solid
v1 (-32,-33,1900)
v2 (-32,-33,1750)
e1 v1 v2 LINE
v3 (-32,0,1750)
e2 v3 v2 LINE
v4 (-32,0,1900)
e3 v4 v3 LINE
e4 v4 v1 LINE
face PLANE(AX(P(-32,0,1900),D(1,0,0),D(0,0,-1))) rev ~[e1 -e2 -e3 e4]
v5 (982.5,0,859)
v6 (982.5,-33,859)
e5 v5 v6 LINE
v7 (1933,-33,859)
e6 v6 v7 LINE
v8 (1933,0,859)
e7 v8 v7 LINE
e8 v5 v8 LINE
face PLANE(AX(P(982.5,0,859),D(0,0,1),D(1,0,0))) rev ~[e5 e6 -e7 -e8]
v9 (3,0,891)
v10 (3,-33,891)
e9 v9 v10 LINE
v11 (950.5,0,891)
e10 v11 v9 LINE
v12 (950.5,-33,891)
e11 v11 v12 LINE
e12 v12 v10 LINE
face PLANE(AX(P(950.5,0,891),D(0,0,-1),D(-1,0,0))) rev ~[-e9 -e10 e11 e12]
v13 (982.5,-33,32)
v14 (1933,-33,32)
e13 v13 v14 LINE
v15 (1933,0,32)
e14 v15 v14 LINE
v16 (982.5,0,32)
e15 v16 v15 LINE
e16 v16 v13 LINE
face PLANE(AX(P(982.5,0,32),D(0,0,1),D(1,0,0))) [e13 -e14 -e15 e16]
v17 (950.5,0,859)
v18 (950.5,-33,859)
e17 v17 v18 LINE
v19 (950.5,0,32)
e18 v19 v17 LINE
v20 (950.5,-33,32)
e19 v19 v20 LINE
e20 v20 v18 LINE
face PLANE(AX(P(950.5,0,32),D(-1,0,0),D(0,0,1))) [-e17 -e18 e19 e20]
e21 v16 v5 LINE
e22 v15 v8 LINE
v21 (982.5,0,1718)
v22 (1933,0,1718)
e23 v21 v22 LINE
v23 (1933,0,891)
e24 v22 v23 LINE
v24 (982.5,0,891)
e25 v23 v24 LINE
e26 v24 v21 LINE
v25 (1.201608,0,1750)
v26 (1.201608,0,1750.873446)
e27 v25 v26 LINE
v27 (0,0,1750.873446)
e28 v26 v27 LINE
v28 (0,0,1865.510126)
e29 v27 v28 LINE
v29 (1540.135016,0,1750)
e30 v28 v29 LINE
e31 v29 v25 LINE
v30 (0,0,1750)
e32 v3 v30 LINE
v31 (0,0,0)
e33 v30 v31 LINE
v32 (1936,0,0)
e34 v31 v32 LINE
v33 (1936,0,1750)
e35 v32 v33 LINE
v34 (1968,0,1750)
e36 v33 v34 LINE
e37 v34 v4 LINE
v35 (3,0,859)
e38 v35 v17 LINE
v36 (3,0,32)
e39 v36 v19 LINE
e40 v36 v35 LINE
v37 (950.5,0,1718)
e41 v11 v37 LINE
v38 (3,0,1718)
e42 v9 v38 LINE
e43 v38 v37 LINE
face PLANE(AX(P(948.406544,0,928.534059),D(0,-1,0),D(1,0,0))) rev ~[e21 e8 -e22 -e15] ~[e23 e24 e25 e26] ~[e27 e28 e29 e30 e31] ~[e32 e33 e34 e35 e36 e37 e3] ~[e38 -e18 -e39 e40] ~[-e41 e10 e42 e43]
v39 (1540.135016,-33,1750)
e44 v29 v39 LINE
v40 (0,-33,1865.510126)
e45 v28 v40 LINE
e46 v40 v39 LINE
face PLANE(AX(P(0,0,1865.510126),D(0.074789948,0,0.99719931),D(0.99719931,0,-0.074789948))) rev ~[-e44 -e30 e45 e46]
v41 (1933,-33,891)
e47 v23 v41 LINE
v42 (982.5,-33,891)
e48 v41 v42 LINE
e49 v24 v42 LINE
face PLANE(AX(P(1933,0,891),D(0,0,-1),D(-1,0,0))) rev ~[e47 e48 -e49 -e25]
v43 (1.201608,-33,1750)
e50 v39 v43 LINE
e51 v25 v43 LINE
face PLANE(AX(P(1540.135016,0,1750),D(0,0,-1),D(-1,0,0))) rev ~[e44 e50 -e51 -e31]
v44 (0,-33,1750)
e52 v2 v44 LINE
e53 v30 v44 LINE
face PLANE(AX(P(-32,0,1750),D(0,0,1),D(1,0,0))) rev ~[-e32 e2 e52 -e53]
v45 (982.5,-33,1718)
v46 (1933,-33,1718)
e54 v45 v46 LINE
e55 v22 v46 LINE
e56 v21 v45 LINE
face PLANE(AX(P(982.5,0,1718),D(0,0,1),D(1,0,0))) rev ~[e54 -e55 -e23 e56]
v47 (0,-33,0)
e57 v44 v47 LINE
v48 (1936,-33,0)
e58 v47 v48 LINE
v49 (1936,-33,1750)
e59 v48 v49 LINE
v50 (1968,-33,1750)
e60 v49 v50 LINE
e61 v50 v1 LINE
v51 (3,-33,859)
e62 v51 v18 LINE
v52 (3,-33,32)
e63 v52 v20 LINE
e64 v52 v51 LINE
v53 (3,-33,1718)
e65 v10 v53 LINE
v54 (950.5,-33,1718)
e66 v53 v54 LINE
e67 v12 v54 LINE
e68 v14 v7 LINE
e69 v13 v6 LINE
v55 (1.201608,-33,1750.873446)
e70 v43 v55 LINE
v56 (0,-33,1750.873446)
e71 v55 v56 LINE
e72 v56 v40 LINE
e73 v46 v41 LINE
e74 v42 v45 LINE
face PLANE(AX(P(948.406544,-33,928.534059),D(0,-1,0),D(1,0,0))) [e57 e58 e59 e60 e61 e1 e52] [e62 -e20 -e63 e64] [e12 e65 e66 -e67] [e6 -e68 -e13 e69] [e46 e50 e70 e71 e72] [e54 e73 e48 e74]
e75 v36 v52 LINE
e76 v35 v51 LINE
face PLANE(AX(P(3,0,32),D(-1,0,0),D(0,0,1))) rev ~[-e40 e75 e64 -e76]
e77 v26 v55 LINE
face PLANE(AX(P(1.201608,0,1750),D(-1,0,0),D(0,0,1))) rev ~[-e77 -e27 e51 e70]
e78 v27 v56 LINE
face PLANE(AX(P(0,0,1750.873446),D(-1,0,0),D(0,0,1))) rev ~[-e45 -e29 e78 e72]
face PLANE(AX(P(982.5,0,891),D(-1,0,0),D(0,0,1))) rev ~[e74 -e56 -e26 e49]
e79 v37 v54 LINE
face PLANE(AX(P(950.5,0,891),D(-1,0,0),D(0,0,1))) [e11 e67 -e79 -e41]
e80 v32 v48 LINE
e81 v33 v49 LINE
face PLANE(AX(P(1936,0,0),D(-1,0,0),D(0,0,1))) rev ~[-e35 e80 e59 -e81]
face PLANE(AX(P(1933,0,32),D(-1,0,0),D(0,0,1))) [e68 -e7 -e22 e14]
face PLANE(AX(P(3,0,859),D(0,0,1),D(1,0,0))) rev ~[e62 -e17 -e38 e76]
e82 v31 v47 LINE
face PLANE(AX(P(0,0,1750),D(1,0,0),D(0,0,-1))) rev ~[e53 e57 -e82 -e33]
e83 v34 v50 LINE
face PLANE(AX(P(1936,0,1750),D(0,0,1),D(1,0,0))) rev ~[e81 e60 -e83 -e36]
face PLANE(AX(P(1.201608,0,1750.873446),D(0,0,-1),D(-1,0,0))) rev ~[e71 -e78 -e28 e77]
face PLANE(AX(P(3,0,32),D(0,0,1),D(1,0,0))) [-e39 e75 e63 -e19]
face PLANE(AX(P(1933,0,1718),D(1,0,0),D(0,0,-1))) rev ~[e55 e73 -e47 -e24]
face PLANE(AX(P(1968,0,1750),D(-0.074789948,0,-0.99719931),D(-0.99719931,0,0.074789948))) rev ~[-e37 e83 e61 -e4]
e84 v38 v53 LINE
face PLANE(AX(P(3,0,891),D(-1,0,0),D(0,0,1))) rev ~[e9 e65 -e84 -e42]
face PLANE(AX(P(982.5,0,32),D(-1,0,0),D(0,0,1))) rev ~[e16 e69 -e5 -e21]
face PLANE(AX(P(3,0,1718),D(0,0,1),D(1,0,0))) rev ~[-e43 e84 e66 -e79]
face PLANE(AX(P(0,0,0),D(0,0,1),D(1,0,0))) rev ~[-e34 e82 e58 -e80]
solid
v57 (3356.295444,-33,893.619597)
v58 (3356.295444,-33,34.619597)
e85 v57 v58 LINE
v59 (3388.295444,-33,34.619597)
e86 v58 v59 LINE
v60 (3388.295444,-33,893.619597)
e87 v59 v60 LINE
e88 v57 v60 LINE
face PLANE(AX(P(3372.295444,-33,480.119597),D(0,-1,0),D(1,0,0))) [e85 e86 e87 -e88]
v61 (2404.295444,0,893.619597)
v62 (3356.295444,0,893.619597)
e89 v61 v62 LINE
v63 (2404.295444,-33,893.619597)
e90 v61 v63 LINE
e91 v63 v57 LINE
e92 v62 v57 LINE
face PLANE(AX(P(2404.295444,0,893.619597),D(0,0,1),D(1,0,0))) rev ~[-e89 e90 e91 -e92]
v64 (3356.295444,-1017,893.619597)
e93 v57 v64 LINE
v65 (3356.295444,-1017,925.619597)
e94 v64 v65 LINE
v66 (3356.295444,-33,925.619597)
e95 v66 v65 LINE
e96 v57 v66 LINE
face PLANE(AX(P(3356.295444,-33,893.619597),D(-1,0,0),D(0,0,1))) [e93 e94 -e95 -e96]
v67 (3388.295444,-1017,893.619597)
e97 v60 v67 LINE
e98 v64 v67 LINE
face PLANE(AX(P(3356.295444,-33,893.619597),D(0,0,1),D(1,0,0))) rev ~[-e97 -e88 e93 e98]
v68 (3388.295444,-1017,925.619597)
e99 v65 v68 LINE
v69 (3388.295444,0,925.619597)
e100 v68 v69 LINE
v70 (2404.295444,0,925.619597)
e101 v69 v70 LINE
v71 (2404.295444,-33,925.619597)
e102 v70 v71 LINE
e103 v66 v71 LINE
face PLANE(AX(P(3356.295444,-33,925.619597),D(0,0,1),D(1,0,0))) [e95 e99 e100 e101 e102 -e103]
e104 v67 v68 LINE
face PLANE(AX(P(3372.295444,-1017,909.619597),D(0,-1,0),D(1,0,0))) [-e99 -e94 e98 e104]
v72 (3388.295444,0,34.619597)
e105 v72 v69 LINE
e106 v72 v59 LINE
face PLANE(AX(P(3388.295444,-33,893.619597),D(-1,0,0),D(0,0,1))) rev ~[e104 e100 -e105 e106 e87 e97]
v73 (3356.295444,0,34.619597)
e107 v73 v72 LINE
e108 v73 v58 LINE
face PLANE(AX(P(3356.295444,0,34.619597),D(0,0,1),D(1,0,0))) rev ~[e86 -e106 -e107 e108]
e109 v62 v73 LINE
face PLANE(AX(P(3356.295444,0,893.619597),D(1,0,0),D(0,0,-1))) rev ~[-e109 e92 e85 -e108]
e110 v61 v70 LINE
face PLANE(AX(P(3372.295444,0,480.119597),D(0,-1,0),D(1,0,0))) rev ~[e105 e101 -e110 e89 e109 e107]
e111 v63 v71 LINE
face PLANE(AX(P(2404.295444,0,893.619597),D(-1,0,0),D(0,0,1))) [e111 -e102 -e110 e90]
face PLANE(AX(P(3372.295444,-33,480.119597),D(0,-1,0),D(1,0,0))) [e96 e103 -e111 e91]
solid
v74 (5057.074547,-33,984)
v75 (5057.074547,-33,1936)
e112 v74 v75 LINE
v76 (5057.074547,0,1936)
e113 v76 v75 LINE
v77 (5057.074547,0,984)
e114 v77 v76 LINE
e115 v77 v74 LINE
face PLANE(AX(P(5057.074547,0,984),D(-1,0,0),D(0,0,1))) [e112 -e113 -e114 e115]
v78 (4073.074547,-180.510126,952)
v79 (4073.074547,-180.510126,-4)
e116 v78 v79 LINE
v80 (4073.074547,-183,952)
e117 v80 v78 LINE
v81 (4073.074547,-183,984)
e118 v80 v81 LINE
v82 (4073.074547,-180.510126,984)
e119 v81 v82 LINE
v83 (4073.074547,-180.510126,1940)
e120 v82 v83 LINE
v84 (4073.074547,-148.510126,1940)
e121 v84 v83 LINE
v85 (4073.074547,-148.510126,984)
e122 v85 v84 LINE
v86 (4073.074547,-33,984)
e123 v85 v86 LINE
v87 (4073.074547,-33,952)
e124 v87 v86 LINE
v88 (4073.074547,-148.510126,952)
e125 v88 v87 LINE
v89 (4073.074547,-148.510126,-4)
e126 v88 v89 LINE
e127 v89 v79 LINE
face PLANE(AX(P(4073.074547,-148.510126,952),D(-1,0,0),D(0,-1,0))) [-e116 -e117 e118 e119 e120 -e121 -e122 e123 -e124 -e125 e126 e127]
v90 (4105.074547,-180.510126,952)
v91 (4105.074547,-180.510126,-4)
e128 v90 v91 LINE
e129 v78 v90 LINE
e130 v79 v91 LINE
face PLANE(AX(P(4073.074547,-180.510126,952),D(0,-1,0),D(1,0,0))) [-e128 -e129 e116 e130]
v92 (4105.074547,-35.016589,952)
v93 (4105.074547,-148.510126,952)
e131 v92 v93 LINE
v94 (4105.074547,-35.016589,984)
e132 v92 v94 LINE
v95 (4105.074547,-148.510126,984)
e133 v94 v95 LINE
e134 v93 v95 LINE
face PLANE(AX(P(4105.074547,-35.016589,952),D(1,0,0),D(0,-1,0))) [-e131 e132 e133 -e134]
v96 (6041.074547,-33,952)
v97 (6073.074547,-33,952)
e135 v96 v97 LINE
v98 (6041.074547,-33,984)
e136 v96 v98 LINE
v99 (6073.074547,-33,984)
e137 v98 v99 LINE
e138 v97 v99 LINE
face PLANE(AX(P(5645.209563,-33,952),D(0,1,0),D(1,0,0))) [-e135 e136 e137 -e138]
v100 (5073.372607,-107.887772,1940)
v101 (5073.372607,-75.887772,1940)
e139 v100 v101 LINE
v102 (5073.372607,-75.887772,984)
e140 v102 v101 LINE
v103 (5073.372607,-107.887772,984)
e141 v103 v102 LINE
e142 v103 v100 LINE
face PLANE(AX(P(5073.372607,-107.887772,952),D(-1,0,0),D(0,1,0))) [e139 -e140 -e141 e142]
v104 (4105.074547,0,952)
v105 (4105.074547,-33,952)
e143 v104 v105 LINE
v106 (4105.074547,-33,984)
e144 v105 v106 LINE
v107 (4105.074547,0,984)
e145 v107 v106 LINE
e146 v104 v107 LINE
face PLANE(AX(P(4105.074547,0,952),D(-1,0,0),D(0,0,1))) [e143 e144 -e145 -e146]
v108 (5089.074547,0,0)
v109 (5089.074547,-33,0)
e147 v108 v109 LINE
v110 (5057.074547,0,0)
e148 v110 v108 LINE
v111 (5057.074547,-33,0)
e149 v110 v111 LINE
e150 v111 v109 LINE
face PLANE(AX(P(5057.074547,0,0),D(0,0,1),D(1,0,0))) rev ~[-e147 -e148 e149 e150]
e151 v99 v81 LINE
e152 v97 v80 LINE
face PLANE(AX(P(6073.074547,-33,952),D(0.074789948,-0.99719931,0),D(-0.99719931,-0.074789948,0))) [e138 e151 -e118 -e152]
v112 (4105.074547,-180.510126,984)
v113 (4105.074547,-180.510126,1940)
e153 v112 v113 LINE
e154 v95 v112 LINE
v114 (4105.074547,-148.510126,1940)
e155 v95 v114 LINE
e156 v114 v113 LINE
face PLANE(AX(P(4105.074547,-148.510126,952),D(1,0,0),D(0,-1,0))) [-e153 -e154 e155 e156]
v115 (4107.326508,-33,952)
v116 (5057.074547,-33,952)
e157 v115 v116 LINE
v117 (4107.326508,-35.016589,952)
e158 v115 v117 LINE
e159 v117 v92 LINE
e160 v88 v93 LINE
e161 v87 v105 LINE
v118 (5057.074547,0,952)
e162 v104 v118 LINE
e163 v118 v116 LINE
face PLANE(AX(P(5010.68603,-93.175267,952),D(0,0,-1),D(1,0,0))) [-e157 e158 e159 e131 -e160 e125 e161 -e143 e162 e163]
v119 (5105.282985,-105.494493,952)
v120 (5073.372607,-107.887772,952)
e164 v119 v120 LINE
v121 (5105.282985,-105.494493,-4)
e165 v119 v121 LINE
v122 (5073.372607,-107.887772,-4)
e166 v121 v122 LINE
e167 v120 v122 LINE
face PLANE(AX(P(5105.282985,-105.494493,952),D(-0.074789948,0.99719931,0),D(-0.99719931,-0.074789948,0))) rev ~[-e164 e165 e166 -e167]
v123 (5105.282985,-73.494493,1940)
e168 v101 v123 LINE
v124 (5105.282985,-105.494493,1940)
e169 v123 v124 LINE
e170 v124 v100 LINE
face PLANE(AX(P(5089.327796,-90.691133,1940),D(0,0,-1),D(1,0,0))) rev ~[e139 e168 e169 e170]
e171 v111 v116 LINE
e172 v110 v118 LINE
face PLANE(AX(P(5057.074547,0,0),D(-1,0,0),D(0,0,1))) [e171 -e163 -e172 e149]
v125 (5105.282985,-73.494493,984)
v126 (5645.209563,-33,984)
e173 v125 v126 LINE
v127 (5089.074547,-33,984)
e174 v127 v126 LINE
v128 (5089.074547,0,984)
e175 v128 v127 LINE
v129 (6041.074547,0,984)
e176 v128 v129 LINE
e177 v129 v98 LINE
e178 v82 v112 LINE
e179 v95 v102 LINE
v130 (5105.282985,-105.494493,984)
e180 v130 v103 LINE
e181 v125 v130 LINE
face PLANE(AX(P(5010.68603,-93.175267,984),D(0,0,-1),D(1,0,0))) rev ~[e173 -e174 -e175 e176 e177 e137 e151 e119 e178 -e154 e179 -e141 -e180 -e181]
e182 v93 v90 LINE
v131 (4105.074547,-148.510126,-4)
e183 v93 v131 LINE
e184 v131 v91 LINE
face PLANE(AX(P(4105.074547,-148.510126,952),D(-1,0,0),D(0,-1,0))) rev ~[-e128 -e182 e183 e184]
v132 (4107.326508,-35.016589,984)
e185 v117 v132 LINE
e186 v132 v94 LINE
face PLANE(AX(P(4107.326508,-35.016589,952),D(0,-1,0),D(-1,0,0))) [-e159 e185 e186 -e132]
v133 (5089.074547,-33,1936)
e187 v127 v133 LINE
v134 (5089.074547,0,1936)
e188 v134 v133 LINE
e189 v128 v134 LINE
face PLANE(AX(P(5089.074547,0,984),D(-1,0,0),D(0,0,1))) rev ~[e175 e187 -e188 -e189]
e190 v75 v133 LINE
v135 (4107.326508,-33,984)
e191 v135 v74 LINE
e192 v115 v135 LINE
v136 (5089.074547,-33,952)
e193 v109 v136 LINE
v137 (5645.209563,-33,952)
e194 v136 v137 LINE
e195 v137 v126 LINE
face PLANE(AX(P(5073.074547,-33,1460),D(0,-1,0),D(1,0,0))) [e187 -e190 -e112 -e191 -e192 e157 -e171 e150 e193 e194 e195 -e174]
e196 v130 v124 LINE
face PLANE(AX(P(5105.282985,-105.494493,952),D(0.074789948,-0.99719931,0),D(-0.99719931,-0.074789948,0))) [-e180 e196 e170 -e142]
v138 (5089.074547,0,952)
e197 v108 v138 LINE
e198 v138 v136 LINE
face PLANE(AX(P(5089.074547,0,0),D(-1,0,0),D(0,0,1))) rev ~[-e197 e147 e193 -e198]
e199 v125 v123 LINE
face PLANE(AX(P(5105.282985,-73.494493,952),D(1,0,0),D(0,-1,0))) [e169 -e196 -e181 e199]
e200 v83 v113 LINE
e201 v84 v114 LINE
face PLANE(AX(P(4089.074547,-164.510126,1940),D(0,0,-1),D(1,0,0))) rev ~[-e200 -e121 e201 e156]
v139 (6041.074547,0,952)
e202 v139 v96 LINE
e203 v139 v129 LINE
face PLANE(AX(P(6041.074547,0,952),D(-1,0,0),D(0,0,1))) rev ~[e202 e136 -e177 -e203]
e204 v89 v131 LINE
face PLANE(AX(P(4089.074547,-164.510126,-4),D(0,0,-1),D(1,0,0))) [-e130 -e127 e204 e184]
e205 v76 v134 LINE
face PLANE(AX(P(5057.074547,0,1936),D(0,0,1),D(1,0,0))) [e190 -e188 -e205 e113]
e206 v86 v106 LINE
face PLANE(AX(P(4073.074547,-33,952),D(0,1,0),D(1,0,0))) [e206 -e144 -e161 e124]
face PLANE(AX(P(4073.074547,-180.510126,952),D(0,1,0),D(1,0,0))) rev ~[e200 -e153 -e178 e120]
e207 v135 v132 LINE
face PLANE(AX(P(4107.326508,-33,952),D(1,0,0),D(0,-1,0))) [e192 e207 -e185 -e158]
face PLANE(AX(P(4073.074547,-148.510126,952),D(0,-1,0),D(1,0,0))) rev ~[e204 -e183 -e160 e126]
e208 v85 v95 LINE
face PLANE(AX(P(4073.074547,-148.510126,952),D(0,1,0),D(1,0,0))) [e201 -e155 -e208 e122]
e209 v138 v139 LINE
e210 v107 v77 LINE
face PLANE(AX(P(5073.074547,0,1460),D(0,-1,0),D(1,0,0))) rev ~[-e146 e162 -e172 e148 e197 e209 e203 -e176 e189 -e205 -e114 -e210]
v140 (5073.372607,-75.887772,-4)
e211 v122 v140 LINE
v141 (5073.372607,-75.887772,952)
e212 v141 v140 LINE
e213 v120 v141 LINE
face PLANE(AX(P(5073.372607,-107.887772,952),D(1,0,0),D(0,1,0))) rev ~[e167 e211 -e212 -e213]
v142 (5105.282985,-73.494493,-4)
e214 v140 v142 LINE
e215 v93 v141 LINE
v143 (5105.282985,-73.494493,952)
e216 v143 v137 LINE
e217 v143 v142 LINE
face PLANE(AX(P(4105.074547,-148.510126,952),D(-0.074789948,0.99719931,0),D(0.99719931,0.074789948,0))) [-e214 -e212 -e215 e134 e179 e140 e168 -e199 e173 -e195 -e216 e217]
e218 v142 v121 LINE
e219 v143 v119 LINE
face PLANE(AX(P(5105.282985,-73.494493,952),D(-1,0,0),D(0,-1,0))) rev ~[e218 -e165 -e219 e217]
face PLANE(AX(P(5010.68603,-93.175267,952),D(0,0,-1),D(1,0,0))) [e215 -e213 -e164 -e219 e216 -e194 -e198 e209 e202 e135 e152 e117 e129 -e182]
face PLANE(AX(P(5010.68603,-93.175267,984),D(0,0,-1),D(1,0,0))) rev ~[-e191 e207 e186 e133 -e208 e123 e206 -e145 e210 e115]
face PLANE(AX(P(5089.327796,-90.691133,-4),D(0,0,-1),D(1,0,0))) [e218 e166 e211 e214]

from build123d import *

# Parameters (mm, degrees)
F0_W     = 952
F0_H     = 32
F1_DEPTH = 33
F0_W_2   = 32
F0_H_2   = 952
F0_W_3   = 947.5
F0_H_3   = 827
F0_W_4   = 950.5
F2_W     = 32
F2_H     = 32
F3_DEPTH = 984
F5_DEPTH = 32
F6_W     = 32
F6_H     = 32
F7_DEPTH = 956
F8_DEPTH = 988


# Not quite as in the source:
# - a feature names something its author has since deleted; it is built from what else it names


with BuildPart() as f1:
    # F0 (on Front) → F1 (new body)
    with BuildSketch(Plane.XZ):
        Polygon((3356.2954444885, 34.6195969582), (3388.2954444885, 34.6195969582), (3388.2954444885, 925.6195969582), (3356.2954444885, 925.6195969582), (3356.2954444885, 893.6195969582), align=None)
        with Locations((2880.2954444885, 909.6195969582)):
            Rectangle(F0_W, F0_H)
    extrude(amount=F1_DEPTH)

    # F2 (on face) → F3 (join)
    with BuildSketch(Plane.XZ.offset(33)):
        with Locations((3372.2954444885, 909.6195969582)):
            Rectangle(F2_W, F2_H)
    extrude(amount=F3_DEPTH)


with BuildPart() as f1b:
    # F0 (on Front) → F1, piece 2 (new body)
    with BuildSketch(Plane.XZ):
        with Locations((5073.074546814, 1460)):
            Rectangle(F0_W_2, F0_H_2)
        with Locations((5073.074546814, 476)):
            Rectangle(F0_W_2, F0_H_2)
        with Locations((4581.074546814, 968)):
            Rectangle(F0_W, F0_H)
        with Locations((5565.074546814, 968)):
            Rectangle(F0_W, F0_H)
        with Locations((5073.074546814, 968)):
            Rectangle(F0_W_2, F0_H)
    extrude(amount=F1_DEPTH)

    # F4 (on face) → F5 (join)
    with BuildSketch(Plane(origin=(0, 0, 952), x_dir=(1, 0, 0), z_dir=(0, 0, -1))):
        Polygon((4073.074546814, 33), (4105.074546814, 33), (4107.3265075684, 33), (4107.3265075684, 35.0165888667), (4105.074546814, 35.0165888667), (4105.074546814, 148.5101262078), (5645.2095629178, 33), (6041.074546814, 33), (6073.074546814, 33), (4073.074546814, 183), align=None)
    extrude(amount=-F5_DEPTH)

    # F6 (on face) → F7 (join)
    with BuildSketch(Plane(origin=(0, 0, 952), x_dir=(1, 0, 0), z_dir=(0, 0, -1))):
        with Locations((4089.074546814, 164.5101262078)):
            Rectangle(F6_W, F6_H)
        Polygon((5073.3726069148, 107.8877717002), (5073.3726069148, 75.8877717002), (5105.2829848312, 73.4944933565), (5105.2829848312, 105.4944933565), align=None)
    extrude(amount=F7_DEPTH)

    # F6 (on face) → F8 (join)
    with BuildSketch(Plane(origin=(0, 0, 952), x_dir=(1, 0, 0), z_dir=(0, 0, -1))):
        with Locations((4089.074546814, 164.5101262078)):
            Rectangle(F6_W, F6_H)
        Polygon((5073.3726069148, 107.8877717002), (5073.3726069148, 75.8877717002), (5105.2829848312, 73.4944933565), (5105.2829848312, 105.4944933565), align=None)
    extrude(amount=-F8_DEPTH)


with BuildPart() as f1c:
    # F0 (on Front) → F1, piece 3 (new body)
    with BuildSketch(Plane.XZ):
        Polygon((0, 1750), (0, 0), (1933, 0), (1936, 0), (1936, 1750), (1968, 1750), (-32, 1900), (-32, 1750), align=None)
        with Locations((476.75, 445.5)):
            Rectangle(F0_W_3, F0_H_3, mode=Mode.SUBTRACT)
        with Locations((1457.75, 445.5)):
            Rectangle(F0_W_4, F0_H_3, mode=Mode.SUBTRACT)
        Polygon((982.5, 891), (982.5, 859), (950.5, 859), (950.5, 891), (3, 891), (3, 1718), (950.5, 1718), (982.5, 1718), (1933, 1718), (1933, 891), align=None, mode=Mode.SUBTRACT)
        Polygon((1540.1350161039, 1750), (1.2016075198, 1750), (1.2016075198, 1750.8734464645), (0, 1750.8734464645), (0, 1865.5101262078), align=None, mode=Mode.SUBTRACT)
        with Locations((966.5, 875)):
            Rectangle(F0_W_2, F0_H)
        with Locations((966.5, 1304.5)):
            Rectangle(F0_W_2, F0_H_3)
    extrude(amount=F1_DEPTH)


solid = Compound([f1.part, f1b.part, f1c.part])
